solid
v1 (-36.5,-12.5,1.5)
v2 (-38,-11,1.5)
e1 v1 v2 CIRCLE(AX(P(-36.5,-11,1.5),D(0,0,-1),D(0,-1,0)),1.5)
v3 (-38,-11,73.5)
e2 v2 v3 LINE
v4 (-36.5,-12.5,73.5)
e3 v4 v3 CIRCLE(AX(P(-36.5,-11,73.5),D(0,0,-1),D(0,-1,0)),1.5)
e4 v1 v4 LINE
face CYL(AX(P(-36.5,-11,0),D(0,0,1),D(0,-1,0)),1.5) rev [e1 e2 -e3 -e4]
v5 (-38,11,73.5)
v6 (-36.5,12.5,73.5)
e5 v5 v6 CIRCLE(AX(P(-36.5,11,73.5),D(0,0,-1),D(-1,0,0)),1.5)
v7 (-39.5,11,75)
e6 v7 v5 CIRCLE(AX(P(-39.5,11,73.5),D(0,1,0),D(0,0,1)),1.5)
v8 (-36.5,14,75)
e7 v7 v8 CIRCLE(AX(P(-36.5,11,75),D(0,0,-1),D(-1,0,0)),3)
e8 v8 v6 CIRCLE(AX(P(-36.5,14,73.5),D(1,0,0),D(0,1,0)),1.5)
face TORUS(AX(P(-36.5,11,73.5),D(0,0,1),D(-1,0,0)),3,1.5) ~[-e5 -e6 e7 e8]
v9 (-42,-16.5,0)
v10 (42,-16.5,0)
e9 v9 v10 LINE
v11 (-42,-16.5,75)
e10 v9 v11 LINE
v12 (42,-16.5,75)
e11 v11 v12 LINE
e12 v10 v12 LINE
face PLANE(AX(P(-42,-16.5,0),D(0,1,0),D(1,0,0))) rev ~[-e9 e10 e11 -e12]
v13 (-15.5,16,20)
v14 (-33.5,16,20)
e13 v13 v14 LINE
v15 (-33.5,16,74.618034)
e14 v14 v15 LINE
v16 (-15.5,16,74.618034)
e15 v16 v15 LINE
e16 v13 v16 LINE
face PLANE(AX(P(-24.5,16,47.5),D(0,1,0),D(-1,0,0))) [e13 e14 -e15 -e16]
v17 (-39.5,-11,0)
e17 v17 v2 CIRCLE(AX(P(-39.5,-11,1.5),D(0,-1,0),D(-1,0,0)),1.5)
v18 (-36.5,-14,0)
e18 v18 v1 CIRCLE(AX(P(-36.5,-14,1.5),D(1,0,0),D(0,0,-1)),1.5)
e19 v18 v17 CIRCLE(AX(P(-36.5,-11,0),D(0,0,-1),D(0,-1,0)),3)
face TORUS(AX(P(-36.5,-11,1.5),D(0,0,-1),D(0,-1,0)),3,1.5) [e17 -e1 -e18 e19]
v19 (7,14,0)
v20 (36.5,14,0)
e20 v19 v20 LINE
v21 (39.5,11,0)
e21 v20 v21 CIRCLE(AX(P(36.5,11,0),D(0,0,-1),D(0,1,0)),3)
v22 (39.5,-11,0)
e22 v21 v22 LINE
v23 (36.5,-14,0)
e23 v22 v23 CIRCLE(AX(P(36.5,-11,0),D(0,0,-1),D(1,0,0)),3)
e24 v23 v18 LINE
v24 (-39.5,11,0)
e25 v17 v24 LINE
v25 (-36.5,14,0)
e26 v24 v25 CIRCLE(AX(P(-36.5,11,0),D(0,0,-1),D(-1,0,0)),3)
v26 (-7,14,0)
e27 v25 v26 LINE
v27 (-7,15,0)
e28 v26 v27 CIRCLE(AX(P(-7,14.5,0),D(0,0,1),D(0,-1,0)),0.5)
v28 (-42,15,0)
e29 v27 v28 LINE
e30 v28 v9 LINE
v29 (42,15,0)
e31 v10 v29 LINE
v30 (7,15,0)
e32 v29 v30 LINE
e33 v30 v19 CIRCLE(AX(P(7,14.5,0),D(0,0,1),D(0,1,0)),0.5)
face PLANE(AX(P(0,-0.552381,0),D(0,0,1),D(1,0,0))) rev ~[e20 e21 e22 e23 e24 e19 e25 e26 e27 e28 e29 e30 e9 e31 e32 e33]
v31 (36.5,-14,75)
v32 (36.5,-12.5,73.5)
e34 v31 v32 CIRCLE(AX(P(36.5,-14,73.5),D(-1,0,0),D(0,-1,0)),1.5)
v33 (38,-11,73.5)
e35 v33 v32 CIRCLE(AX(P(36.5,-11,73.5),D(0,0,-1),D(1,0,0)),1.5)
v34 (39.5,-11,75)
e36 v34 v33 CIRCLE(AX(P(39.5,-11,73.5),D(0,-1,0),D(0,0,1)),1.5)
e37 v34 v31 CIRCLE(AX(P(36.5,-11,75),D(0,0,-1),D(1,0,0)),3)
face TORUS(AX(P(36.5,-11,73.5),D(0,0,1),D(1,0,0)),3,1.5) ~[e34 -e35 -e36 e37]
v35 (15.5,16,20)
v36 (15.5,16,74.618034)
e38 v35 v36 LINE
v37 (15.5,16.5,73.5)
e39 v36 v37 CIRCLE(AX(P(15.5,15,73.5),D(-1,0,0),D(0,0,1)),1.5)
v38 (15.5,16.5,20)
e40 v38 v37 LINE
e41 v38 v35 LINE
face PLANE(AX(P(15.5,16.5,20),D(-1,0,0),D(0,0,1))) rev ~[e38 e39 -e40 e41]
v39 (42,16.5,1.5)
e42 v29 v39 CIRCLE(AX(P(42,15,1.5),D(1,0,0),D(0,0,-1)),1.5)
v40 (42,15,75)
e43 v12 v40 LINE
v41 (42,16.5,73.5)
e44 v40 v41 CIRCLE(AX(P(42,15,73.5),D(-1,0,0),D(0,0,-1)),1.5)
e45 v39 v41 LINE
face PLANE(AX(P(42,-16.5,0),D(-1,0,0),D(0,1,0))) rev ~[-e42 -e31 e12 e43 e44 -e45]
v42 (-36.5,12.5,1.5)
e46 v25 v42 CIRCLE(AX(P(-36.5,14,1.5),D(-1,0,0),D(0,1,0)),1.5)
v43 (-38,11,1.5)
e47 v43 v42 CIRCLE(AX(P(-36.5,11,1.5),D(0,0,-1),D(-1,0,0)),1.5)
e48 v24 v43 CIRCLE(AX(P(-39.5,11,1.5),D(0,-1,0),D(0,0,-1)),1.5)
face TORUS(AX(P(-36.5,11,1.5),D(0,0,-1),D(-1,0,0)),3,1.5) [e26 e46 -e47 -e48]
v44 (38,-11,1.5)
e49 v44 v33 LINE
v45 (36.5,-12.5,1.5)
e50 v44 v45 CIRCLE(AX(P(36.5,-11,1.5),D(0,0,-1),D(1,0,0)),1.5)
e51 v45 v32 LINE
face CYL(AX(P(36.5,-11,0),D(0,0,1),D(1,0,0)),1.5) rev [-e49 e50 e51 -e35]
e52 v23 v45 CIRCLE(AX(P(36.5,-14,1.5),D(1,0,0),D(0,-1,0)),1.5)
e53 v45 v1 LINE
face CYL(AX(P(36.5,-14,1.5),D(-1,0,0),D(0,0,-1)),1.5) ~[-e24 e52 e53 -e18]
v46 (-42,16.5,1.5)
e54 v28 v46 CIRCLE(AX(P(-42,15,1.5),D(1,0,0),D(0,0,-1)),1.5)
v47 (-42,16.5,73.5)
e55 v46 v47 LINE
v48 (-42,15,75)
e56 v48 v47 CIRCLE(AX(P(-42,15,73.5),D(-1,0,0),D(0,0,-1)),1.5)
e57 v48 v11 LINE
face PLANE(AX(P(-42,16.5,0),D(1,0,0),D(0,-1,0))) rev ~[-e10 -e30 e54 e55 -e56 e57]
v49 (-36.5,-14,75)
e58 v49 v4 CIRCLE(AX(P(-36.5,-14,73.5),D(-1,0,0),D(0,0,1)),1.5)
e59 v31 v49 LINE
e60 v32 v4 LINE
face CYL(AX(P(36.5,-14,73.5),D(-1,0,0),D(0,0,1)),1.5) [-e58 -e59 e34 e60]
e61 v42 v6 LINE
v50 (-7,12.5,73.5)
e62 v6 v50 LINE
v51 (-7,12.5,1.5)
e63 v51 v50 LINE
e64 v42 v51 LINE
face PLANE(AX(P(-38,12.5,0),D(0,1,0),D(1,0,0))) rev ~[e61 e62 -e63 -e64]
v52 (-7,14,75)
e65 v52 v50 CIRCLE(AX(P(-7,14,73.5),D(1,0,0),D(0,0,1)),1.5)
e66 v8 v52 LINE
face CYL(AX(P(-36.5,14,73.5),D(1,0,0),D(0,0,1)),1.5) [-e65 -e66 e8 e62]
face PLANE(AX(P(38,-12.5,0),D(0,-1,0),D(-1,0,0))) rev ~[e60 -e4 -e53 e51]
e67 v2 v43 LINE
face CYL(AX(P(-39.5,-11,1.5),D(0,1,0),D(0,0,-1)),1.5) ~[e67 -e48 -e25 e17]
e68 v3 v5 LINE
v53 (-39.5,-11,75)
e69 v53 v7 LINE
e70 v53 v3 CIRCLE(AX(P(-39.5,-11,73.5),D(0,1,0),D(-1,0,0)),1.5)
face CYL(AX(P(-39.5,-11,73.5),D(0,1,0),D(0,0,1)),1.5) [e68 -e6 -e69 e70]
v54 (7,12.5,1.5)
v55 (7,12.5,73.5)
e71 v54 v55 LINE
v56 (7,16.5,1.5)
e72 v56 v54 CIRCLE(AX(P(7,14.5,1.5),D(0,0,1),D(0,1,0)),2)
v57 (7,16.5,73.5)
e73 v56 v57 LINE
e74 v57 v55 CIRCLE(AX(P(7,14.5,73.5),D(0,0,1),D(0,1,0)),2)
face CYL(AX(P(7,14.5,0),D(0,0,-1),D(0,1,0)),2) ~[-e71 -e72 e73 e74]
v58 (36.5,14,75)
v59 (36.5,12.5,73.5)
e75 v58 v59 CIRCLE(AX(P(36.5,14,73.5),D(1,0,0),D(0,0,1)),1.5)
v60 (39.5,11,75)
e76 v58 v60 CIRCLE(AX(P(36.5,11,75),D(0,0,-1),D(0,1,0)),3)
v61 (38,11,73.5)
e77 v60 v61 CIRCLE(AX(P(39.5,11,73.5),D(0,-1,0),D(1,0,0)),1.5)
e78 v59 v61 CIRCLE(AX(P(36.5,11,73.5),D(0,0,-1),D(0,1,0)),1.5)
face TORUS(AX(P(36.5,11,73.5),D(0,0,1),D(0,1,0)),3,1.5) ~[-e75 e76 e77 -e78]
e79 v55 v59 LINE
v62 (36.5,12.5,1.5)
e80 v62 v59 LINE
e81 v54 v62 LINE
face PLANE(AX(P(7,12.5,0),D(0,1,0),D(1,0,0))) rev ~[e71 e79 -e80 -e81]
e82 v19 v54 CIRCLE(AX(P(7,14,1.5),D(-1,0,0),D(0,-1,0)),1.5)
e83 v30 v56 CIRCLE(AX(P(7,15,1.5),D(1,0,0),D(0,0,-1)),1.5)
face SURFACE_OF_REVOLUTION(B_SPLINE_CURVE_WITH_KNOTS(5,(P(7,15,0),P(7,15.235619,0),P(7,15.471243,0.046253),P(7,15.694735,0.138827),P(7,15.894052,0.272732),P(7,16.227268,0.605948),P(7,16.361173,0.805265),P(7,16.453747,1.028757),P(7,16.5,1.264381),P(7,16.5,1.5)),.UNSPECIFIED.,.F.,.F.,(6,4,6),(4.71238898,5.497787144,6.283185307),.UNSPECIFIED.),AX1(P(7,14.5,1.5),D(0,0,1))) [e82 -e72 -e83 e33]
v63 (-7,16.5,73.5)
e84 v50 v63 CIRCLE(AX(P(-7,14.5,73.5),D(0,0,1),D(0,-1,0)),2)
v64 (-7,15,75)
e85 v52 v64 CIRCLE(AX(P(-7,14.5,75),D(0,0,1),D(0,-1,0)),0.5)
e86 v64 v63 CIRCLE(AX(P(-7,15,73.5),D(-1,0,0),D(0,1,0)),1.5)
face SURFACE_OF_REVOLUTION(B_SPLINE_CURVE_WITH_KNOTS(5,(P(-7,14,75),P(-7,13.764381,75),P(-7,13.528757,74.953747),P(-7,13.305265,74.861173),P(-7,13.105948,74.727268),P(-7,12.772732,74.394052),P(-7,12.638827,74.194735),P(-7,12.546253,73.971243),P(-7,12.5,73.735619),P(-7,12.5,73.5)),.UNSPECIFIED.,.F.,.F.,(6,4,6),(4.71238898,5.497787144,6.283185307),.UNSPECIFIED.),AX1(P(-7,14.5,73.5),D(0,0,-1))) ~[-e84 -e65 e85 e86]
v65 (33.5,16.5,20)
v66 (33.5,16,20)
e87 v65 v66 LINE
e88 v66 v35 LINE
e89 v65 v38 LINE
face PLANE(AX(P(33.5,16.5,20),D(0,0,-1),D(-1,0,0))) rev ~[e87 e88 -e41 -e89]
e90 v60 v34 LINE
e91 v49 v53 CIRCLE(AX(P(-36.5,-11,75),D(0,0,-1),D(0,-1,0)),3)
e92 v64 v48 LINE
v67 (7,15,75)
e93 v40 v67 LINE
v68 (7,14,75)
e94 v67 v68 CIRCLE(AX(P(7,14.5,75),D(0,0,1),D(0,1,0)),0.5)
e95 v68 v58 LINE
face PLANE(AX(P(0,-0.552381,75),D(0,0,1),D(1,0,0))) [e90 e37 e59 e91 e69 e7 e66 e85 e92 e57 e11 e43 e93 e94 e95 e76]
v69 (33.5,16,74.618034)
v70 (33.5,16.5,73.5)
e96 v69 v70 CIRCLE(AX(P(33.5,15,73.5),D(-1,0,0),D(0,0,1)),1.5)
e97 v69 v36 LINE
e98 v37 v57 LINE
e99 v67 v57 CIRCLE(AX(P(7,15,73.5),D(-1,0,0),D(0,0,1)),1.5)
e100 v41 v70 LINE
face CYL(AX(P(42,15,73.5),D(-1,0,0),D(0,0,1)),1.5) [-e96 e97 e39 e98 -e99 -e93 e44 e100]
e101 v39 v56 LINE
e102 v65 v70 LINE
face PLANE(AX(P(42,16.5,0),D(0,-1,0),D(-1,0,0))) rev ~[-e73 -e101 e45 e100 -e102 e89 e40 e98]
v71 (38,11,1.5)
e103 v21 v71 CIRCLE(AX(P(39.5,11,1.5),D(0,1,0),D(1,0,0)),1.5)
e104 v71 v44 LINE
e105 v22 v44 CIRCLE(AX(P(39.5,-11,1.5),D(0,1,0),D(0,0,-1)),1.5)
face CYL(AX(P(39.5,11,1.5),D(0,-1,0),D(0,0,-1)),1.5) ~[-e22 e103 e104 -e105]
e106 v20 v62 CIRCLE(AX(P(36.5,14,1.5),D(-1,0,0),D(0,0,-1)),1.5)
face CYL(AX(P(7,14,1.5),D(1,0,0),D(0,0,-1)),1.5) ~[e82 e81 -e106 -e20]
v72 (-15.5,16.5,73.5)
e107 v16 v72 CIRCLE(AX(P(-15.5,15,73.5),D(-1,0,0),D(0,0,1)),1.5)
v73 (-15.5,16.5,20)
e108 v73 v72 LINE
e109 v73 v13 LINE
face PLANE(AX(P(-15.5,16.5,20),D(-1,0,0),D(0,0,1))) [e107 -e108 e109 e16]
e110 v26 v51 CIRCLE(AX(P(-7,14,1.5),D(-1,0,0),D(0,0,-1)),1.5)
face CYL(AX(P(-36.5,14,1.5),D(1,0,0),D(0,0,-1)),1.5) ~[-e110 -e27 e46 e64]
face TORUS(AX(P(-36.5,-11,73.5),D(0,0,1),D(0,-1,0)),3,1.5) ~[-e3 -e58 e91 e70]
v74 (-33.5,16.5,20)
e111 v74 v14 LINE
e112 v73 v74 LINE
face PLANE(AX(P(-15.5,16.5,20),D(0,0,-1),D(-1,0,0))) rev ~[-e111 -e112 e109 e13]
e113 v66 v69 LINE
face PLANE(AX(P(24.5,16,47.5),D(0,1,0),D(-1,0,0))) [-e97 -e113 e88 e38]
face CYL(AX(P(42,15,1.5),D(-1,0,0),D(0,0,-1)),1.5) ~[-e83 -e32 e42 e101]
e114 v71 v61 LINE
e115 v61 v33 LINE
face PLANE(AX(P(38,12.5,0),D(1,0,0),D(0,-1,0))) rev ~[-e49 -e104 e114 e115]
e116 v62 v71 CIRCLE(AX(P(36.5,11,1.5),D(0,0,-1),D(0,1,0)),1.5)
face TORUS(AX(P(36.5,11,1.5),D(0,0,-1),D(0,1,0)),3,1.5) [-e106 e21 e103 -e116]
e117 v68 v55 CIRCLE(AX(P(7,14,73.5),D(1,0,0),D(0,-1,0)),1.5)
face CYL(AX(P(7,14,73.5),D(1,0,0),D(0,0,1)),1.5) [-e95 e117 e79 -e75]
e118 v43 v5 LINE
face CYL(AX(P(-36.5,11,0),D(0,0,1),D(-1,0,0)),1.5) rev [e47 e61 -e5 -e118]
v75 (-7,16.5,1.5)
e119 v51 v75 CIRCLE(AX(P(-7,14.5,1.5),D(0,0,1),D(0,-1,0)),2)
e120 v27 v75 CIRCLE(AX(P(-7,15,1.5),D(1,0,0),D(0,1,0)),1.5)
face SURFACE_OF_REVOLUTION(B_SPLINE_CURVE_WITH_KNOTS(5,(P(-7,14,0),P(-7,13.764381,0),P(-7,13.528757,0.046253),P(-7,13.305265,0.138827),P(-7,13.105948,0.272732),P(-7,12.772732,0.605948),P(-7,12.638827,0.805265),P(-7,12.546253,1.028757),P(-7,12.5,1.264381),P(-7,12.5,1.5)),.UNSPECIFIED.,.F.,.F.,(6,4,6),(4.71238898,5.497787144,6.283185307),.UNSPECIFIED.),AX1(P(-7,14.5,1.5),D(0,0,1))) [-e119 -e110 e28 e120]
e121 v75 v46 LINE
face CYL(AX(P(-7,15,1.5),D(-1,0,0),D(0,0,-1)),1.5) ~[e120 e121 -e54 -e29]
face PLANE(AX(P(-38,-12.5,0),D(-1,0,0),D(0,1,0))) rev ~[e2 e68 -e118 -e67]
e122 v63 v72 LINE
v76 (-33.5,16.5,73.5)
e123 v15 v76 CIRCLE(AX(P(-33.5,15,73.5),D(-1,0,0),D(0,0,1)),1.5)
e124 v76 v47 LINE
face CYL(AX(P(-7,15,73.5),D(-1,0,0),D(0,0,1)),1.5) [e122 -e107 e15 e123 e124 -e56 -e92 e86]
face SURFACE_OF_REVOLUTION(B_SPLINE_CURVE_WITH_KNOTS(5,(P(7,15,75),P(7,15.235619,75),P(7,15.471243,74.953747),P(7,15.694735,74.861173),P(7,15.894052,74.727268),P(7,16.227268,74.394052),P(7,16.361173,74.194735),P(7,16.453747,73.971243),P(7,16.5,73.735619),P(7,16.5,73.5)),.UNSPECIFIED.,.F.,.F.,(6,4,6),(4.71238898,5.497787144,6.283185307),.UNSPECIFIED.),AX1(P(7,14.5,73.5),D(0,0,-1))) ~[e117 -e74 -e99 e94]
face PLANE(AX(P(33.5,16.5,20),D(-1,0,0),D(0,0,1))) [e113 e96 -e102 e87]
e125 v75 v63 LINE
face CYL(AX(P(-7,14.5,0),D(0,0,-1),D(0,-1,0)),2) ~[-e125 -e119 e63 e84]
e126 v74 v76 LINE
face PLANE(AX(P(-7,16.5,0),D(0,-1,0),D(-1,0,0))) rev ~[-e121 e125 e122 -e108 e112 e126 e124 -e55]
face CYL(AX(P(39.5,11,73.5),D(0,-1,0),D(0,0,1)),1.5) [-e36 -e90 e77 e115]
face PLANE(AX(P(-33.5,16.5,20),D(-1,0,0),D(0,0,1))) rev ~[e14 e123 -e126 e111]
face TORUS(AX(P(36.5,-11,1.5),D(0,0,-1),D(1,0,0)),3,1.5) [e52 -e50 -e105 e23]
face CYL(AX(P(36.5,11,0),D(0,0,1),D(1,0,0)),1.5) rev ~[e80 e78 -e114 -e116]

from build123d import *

# Parameters (mm, degrees)
F1_DEPTH = 75
F2_F1_R  = 1.5
F2_F2_R  = 1.5
F4_W     = 18
F4_H     = 55
F5_DEPTH = 0.5


# Not quite as in the source:
# - a feature names something its author has since deleted; it is built from what else it names


with BuildPart() as f1:
    # F0 (on Top) → F1 (new body)
    with BuildSketch(Plane.XY):
        with BuildLine():
            Line((38, 12.5), (38, -12.5))
            Line((38, -12.5), (-38, -12.5))
            Line((-38, -12.5), (-38, 12.5))
            Line((-38, 12.5), (-7, 12.5))
            ThreePointArc((-7, 12.5), (-5, 14.5), (-7, 16.5))
            Line((-7, 16.5), (-42, 16.5))
            Line((-42, 16.5), (-42, -16.5))
            Line((-42, -16.5), (42, -16.5))
            Line((42, -16.5), (42, 16.5))
            Line((42, 16.5), (7, 16.5))
            ThreePointArc((7, 16.5), (5, 14.5), (7, 12.5))
            Line((7, 12.5), (38, 12.5))
        make_face()
    extrude(amount=F1_DEPTH)

    # F2: fillet of radius 1.5 on 12 edges, made by hand

    # F2_f1
    f2_f1_edges = [f1.edges().sort_by_distance(p)[0] for p in [
        (38, -12.5, 37.5),
        (-38, -12.5, 37.5),
        (-38, 12.5, 37.5),
        (38, 12.5, 37.5),
    ]]
    fillet(f2_f1_edges, radius=F2_F1_R)

    # F2_f2
    f2_f2_edges = [f1.edges().sort_by_distance(p)[0] for p in [
        (0, -12.5, 0),
        (0, -12.5, 75),
        (21.75, 12.5, 0),
        (21.75, 12.5, 75),
        (5, 14.5, 75),
        (24.5, 16.5, 75),
        (5, 14.5, 0),
        (24.5, 16.5, 0),
        (37.5606601718, 12.0606601718, 75),
        (37.5606601718, 12.0606601718, 0),
        (37.5606601718, -12.0606601718, 75),
        (-37.5606601718, -12.0606601718, 75),
        (37.5606601718, -12.0606601718, 0),
        (-37.5606601718, -12.0606601718, 0),
    ]]
    fillet(f2_f2_edges, radius=F2_F2_R)

    # F4 (on offset) → F5 (cut)
    with BuildSketch(Plane(origin=(0, 16.5, 0), x_dir=(-1, 0, 0), z_dir=(0, 1, 0))):
        with Locations((-24.5, 47.5)):
            Rectangle(F4_W, F4_H)
        with Locations((24.5, 47.5)):
            Rectangle(F4_W, F4_H)
    extrude(amount=-F5_DEPTH, mode=Mode.SUBTRACT)


solid = f1.part
